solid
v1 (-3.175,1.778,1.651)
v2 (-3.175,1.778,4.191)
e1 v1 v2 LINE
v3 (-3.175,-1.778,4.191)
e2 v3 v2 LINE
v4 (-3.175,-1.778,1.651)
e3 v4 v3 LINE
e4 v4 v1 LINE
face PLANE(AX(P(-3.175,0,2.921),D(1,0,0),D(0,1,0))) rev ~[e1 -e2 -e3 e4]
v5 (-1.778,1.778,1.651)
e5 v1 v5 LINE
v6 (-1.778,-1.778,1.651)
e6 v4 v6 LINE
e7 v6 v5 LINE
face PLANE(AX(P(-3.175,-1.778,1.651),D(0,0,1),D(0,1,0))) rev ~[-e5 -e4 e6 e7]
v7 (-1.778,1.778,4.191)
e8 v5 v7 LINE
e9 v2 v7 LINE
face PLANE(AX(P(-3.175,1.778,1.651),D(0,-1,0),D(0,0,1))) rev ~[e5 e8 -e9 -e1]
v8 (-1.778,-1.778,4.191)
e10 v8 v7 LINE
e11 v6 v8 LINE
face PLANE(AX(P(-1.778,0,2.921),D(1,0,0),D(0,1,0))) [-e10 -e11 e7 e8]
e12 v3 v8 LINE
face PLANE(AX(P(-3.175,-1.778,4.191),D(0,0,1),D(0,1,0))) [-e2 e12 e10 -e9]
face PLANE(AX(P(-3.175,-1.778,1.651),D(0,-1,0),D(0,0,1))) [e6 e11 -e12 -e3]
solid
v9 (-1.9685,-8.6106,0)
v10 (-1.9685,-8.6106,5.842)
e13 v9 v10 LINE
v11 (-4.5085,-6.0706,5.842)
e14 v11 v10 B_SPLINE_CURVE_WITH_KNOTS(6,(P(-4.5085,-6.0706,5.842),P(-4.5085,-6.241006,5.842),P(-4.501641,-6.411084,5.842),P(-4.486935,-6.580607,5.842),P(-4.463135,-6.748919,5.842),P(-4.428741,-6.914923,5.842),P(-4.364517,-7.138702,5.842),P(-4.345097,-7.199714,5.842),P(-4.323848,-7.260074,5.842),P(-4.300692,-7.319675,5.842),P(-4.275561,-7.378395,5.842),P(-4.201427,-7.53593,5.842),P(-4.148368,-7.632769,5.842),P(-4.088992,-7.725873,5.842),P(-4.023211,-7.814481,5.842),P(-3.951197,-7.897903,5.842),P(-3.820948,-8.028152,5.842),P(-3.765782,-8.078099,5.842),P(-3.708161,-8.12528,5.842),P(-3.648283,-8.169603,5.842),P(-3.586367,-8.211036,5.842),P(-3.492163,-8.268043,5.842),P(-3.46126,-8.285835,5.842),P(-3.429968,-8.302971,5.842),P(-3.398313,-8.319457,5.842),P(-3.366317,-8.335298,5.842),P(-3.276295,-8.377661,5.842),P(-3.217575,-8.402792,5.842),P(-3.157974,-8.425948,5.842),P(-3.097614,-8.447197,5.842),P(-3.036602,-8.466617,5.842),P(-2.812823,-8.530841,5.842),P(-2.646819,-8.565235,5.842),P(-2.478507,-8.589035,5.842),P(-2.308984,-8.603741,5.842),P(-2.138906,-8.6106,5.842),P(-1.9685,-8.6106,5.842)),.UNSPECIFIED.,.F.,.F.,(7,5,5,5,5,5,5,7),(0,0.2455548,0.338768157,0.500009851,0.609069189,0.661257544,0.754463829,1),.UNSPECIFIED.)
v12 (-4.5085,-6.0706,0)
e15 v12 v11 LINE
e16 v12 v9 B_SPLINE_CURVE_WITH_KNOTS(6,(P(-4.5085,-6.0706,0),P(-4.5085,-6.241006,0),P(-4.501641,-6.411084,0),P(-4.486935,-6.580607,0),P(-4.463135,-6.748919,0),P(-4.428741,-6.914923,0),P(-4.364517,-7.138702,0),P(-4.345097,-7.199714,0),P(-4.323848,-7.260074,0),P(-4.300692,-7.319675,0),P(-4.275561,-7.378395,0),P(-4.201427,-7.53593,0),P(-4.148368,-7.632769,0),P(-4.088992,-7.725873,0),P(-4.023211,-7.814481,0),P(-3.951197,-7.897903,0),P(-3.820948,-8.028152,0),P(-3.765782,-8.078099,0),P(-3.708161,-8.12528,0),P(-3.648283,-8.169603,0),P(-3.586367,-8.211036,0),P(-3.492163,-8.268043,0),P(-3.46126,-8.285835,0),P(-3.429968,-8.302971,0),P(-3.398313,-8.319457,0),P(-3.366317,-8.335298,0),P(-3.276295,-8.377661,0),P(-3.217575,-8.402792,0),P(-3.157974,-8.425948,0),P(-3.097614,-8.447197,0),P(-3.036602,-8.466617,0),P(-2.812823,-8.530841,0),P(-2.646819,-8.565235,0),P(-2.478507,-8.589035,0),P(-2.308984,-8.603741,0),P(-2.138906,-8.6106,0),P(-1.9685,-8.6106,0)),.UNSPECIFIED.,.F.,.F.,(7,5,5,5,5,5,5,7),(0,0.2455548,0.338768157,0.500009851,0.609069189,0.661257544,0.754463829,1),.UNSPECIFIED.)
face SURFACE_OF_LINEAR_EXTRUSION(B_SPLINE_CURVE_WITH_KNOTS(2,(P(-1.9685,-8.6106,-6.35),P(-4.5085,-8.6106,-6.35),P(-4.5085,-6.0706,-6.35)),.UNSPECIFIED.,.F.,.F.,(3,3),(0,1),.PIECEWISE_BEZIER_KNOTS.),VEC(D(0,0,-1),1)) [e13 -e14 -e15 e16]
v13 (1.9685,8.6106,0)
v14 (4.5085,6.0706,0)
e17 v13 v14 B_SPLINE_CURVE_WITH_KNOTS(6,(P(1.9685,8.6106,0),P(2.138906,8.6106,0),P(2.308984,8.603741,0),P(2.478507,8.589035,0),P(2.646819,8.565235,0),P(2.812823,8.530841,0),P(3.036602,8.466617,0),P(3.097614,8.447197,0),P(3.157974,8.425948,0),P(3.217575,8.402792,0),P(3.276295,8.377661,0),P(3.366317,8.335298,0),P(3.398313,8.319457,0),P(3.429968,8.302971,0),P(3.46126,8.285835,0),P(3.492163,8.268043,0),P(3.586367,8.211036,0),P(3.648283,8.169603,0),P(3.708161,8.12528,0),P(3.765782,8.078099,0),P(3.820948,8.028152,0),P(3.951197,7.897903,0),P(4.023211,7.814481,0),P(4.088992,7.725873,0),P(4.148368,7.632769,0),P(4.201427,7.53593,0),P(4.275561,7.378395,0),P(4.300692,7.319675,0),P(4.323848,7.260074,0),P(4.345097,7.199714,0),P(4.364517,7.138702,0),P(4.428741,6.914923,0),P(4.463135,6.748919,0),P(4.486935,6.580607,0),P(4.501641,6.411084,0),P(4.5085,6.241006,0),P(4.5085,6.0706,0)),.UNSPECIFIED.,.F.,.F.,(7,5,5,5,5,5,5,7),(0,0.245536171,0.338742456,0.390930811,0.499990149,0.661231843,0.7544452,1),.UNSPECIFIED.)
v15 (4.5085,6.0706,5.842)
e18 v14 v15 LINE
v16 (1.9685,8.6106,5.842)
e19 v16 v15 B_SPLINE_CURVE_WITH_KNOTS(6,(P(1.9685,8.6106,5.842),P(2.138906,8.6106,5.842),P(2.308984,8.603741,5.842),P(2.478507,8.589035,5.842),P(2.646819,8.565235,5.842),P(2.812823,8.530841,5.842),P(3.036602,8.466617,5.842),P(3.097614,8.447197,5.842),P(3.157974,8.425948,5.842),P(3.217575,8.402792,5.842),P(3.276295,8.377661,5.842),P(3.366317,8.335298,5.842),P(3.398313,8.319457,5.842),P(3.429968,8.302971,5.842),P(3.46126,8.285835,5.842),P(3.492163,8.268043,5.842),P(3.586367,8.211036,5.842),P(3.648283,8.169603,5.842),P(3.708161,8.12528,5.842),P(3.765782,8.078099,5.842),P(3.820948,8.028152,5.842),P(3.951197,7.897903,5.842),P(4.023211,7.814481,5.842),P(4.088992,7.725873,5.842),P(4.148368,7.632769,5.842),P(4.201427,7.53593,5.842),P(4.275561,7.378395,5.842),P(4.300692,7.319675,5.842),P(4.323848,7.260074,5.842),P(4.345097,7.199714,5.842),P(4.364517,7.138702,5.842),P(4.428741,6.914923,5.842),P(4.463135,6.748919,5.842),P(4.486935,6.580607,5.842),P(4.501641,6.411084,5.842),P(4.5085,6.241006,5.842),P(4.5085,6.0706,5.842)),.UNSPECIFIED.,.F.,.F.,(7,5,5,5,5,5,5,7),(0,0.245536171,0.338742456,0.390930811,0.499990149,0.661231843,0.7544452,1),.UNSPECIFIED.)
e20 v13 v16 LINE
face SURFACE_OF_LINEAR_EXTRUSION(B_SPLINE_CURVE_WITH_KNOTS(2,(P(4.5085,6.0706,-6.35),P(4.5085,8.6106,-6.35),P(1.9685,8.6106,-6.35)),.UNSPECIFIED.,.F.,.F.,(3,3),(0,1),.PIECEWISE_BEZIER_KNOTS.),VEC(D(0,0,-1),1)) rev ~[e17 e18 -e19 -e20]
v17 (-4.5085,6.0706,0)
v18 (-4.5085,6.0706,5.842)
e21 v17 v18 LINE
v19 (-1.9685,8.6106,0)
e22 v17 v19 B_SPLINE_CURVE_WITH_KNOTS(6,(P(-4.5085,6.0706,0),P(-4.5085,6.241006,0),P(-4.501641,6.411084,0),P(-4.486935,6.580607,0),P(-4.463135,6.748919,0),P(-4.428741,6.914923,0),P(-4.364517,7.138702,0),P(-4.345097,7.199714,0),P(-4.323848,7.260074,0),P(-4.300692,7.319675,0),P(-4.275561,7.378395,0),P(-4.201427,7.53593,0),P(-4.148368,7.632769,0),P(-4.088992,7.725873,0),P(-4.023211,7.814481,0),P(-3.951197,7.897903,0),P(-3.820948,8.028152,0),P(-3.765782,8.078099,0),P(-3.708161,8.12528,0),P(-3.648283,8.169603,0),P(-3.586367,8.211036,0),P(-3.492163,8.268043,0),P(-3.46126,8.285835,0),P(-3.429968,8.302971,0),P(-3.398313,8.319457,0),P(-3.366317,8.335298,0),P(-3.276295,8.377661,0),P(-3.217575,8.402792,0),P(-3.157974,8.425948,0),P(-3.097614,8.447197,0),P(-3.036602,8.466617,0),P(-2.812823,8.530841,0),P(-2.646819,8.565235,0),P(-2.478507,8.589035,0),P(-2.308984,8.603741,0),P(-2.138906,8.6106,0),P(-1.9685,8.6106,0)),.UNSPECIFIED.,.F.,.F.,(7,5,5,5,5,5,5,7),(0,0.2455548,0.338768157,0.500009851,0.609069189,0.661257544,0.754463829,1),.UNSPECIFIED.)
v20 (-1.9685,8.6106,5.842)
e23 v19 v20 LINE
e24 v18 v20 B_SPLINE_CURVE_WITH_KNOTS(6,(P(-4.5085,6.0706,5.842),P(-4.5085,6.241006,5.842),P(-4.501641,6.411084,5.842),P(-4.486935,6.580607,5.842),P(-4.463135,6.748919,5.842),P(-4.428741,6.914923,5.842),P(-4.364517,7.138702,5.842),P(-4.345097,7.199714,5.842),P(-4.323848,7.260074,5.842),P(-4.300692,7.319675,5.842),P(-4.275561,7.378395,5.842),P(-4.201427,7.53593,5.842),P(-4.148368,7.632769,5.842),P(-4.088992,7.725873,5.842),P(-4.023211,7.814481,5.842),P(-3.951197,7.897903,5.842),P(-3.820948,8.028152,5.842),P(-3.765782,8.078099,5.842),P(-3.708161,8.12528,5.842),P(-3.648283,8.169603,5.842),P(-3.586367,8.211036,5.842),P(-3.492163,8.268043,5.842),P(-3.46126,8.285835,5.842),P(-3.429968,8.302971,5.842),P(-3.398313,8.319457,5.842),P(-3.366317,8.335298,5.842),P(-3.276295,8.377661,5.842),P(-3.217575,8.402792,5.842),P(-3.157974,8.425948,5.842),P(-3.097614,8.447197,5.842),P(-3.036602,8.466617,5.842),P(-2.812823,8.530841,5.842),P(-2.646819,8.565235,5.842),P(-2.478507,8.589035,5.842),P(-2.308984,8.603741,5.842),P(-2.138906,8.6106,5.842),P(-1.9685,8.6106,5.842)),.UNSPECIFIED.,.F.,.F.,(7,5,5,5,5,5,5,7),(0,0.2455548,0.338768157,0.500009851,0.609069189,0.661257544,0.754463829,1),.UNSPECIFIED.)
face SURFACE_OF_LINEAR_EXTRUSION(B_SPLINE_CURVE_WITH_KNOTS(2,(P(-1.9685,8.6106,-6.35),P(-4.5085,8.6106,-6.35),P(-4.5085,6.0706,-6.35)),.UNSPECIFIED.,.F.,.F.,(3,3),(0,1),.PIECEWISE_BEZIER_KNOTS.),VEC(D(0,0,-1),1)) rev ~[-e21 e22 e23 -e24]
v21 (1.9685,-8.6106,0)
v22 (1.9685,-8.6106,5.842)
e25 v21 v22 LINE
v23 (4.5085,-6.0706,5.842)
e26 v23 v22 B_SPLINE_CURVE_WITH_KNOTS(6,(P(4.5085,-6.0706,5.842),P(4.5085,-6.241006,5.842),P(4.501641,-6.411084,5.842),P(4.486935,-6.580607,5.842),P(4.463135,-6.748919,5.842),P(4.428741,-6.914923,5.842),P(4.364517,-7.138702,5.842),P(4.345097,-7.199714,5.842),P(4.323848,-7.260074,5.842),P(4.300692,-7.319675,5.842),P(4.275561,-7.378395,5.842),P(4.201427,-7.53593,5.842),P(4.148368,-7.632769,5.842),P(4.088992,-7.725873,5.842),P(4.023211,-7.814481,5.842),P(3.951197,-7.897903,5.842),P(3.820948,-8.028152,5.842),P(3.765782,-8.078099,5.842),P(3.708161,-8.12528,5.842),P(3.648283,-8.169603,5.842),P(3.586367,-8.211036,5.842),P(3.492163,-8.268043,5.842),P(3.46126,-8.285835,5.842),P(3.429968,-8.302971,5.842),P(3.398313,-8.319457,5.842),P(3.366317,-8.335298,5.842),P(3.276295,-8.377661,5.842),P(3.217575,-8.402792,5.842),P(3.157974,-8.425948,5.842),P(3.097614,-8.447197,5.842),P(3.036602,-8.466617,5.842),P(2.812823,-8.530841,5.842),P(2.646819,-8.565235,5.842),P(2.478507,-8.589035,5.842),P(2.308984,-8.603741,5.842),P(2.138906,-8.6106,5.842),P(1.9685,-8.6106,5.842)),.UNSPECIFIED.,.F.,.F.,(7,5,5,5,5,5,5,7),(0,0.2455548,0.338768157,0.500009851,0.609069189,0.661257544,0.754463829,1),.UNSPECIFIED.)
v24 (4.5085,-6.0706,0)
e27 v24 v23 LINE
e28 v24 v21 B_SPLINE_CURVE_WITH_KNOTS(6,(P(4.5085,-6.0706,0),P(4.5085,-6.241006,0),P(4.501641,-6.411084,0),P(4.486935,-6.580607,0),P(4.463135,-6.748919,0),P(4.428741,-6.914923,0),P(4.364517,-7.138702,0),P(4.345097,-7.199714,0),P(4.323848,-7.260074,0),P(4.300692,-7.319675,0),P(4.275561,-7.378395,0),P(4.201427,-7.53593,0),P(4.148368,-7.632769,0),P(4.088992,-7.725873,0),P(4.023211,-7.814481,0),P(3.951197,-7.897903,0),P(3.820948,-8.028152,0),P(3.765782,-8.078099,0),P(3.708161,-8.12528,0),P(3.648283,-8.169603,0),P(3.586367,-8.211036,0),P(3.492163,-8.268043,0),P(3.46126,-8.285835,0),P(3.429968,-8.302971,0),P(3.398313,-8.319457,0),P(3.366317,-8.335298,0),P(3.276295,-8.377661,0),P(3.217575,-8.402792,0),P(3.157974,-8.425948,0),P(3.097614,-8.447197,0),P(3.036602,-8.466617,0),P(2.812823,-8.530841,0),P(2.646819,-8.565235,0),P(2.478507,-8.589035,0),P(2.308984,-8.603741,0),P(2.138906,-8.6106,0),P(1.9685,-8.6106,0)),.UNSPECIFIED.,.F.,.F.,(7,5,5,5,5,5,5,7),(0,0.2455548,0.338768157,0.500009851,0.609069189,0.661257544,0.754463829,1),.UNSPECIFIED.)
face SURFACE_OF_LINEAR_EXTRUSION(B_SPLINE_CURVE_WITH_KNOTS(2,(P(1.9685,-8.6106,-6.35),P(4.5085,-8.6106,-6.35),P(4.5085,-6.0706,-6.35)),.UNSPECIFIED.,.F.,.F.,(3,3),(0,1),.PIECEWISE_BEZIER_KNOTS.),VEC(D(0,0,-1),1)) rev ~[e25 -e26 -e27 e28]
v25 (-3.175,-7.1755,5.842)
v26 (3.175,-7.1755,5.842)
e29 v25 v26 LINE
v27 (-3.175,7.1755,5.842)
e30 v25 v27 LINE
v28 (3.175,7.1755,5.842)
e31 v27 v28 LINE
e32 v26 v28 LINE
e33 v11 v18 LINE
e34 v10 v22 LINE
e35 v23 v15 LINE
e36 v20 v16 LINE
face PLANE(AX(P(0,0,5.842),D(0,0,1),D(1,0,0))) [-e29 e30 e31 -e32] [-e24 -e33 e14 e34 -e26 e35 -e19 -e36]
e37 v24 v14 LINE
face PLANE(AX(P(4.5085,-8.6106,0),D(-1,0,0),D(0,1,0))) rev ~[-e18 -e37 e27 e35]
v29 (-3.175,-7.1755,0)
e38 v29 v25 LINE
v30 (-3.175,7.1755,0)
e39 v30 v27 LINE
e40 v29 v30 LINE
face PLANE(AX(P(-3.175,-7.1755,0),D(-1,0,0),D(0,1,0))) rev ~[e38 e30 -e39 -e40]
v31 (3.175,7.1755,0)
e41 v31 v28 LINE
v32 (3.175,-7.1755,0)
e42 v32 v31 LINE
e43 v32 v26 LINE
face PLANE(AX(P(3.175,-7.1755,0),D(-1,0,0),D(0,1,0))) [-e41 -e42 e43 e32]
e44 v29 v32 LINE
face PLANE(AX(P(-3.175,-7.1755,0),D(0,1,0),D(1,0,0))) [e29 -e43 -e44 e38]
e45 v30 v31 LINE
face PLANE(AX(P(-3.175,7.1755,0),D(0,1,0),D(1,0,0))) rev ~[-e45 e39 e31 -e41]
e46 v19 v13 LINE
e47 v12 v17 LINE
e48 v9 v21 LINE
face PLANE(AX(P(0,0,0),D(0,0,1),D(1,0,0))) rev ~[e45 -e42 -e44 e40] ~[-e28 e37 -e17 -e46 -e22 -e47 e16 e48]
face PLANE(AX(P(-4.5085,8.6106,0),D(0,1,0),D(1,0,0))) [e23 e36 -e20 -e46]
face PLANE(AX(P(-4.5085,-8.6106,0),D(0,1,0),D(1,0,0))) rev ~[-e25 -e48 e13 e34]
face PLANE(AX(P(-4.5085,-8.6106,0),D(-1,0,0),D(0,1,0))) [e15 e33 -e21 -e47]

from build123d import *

# Parameters (mm, degrees)
F0_W        = 9.017
F0_H        = 17.2212
F0_W_2      = 6.35
F0_H_2      = 14.351
F1_DEPTH    = 5.842
F2_T1_DEPTH = 18.542
F3_W        = 3.556
F3_H        = 2.54
F4_DEPTH    = 1.397


# Not quite as in the source:
# - a fillet or chamfer that OpenCascade refuses, or shapes differently, is made with other operations: its cross-section is extruded or revolved along the edge and cut away or added


with BuildPart() as f1:
    # F0 (on Top) → F1 (new body)
    with BuildSketch(Plane.XY):
        Rectangle(F0_W, F0_H)
        Rectangle(F0_W_2, F0_H_2, mode=Mode.SUBTRACT)
    extrude(amount=F1_DEPTH)

    # F2: fillet of radius 2.54 on 4 edges, made by hand

    # F2_s2 → F2_t1 (cut)
    with BuildSketch(Plane.XY.offset(-6.35)):
        with BuildLine():
            add(Edge.make_bspline(
                [(-1.9685, 8.6106), (-4.5085, 8.6106), (-4.5085, 6.0706)],
                knots=[0, 0, 0, 1, 1, 1], degree=2, weights=[1, 1, 1]))
            Line((-4.5085, 6.0706), (-4.5085, 8.6106))
            Line((-4.5085, 8.6106), (-1.9685, 8.6106))
        make_face()
        with BuildLine():
            add(Edge.make_bspline(
                [(-1.9685, -8.6106), (-4.5085, -8.6106), (-4.5085, -6.0706)],
                knots=[0, 0, 0, 1, 1, 1], degree=2, weights=[1, 1, 1]))
            Line((-4.5085, -6.0706), (-4.5085, -8.6106))
            Line((-4.5085, -8.6106), (-1.9685, -8.6106))
        make_face()
        with BuildLine():
            add(Edge.make_bspline(
                [(1.9685, -8.6106), (4.5085, -8.6106), (4.5085, -6.0706)],
                knots=[0, 0, 0, 1, 1, 1], degree=2, weights=[1, 1, 1]))
            Line((4.5085, -6.0706), (4.5085, -8.6106))
            Line((4.5085, -8.6106), (1.9685, -8.6106))
        make_face()
        with BuildLine():
            add(Edge.make_bspline(
                [(4.5085, 6.0706), (4.5085, 8.6106), (1.9685, 8.6106)],
                knots=[0, 0, 0, 1, 1, 1], degree=2, weights=[1, 1, 1]))
            Line((1.9685, 8.6106), (4.5085, 8.6106))
            Line((4.5085, 8.6106), (4.5085, 6.0706))
        make_face()
    extrude(amount=F2_T1_DEPTH, mode=Mode.SUBTRACT)


with BuildPart() as f4:
    # F3 (on face) → F4 (new body)
    with BuildSketch(Plane.YZ.offset(-3.175)):
        with Locations((0, 2.921)):
            Rectangle(F3_W, F3_H)
    extrude(amount=F4_DEPTH)


solid = Compound([f1.part, f4.part])
